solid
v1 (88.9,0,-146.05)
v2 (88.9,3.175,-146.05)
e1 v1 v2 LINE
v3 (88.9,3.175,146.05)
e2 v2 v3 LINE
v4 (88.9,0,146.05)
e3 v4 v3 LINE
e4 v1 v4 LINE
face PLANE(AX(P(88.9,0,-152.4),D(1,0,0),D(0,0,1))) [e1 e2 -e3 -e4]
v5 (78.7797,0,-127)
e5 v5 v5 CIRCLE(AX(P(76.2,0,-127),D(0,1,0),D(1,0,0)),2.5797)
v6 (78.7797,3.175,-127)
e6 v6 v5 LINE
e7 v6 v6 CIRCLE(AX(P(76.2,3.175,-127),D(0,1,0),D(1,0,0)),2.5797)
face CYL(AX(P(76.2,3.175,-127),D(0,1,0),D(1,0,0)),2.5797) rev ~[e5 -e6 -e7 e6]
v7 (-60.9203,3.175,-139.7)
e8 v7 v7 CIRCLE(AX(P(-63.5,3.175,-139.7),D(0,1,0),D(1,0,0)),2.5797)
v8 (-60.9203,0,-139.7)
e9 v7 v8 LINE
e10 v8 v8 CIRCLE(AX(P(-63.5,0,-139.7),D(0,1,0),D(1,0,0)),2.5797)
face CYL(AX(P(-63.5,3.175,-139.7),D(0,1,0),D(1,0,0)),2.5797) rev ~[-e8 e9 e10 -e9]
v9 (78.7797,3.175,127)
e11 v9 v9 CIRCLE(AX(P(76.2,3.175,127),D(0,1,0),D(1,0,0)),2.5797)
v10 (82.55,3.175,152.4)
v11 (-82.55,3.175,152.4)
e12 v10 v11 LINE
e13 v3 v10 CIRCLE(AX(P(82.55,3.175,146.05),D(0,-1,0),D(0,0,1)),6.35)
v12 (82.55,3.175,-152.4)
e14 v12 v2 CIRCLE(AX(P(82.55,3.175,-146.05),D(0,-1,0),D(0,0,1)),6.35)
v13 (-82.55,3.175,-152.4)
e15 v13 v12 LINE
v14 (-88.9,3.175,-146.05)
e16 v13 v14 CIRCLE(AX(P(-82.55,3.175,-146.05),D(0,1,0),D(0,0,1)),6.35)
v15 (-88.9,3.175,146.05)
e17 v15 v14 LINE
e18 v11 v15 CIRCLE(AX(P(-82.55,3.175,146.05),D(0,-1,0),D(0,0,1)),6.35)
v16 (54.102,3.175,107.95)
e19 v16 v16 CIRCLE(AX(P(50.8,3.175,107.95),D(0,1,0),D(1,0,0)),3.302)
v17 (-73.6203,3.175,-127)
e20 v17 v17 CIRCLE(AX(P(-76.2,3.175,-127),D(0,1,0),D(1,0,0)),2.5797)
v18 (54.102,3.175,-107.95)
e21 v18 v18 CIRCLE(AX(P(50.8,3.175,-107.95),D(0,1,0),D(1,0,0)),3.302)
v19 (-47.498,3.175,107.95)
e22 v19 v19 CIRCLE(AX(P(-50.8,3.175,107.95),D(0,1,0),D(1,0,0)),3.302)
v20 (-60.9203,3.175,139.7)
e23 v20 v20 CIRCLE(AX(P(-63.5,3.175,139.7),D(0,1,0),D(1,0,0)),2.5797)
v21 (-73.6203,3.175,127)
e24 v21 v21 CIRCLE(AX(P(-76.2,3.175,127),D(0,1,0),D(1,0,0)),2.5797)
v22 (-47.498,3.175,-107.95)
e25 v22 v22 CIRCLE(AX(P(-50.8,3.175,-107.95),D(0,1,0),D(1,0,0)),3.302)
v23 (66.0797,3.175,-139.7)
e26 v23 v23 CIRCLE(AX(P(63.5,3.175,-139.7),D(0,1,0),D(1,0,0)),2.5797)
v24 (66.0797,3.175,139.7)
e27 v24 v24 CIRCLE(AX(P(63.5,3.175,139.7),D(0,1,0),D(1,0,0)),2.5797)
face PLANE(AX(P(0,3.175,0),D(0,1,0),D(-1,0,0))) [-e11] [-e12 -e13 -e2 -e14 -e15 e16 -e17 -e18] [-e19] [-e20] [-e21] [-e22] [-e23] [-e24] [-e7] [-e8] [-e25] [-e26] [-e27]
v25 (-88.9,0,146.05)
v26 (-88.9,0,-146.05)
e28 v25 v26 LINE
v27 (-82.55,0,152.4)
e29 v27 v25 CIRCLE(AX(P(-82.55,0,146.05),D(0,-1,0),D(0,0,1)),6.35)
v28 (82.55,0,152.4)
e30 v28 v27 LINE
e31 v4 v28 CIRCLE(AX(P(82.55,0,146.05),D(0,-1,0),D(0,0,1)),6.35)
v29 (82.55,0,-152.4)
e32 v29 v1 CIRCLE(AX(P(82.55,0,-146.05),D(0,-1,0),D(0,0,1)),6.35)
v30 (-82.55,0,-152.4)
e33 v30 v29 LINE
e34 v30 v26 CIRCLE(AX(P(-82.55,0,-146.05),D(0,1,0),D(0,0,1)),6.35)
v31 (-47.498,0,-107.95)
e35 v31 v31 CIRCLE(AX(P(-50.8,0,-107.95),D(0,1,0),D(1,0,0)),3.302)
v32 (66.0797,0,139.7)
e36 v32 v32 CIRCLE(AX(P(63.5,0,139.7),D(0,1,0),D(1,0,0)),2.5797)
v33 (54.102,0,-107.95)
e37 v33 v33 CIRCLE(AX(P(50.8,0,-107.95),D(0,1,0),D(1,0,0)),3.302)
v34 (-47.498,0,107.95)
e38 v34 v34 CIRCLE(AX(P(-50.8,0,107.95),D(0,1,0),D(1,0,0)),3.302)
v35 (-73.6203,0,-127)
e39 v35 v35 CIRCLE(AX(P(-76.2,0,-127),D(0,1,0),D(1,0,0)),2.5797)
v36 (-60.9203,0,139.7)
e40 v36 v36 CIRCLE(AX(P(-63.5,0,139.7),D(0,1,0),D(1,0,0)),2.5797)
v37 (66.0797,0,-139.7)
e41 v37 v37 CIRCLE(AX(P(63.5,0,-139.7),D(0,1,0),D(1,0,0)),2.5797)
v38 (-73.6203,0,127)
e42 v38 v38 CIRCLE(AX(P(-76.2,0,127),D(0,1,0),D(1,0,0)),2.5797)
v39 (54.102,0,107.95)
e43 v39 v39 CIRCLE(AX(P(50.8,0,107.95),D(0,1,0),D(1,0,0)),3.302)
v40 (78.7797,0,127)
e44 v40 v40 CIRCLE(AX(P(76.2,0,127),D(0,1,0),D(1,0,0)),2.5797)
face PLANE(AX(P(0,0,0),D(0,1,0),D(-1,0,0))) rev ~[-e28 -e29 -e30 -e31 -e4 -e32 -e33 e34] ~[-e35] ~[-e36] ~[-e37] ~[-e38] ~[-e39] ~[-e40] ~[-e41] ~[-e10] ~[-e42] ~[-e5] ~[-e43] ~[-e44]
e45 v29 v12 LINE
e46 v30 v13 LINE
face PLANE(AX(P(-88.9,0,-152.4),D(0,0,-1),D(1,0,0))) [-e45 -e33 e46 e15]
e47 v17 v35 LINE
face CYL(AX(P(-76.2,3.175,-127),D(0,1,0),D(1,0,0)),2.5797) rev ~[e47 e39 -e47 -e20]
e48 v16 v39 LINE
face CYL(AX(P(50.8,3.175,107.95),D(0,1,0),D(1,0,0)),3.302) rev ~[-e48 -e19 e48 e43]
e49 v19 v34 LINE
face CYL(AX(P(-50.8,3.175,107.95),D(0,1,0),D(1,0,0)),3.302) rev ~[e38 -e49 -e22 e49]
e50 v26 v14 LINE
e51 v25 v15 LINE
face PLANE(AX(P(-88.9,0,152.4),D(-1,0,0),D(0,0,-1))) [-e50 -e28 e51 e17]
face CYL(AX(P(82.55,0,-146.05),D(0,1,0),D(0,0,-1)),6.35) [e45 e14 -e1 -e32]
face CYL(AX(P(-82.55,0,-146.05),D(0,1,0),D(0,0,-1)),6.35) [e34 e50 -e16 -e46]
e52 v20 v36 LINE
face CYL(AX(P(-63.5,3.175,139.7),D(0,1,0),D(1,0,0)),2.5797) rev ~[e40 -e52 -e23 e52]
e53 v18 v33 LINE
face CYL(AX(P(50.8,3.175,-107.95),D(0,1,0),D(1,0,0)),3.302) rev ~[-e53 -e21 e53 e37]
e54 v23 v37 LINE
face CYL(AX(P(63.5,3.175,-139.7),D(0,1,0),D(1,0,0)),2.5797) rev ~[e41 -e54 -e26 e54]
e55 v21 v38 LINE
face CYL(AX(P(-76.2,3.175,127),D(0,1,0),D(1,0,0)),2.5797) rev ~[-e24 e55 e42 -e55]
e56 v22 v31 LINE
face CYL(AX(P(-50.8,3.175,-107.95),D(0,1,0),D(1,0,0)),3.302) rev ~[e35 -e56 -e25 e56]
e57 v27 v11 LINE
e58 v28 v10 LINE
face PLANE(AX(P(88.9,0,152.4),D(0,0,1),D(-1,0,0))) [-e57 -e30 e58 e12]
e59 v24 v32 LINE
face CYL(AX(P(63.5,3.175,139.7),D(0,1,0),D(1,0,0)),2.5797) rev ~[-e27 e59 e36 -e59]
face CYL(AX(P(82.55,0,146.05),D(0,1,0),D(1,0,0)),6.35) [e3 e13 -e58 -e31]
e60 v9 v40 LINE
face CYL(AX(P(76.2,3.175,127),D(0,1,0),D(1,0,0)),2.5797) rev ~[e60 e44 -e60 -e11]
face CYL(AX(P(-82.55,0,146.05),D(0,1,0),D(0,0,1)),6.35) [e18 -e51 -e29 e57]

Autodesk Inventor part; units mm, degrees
ref_plane "YZ Plane" through (0, 0, 0) normal (1, 0, 0) x (0, 1, 0)
ref_plane "XZ Plane" through (0, 0, 0) normal (0, 1, 0) x (-1, 0, 0)
ref_plane "XY Plane" through (0, 0, 0) normal (0, 0, 1) x (1, 0, 0)
sketch "Sketch1" plane through (0, 0, 0) normal (0, 1, 0) x (-1, 0, 0)
  line L0 (88.9, -152.4) -> (-88.9, -152.4)
  line L1 (-88.9, -152.4) -> (-88.9, 152.4)
  line L2 (-88.9, 152.4) -> (88.9, 152.4)
  line L3 (88.9, 152.4) -> (88.9, -152.4)
  line L4 (88.9, -152.4) -> (-88.9, 152.4) construction
  line L5 (-88.9, -152.4) -> (88.9, 152.4) construction
  point P0 (0, 0)
  dimension "d0" = 177.8
  dimension "d1" = 304.8
extrude "Plate1" add sketch "Sketch1" along normal blind 3.175
fillet "Corner Round1" radius 6.35 4 edges at (-88.9, 1.5875, 152.4) (88.9, 1.5875, 152.4) (-88.9, 1.5875, -152.4) (88.9, 1.5875, -152.4)
sketch "Sketch2" plane through (0, 3.175, 0) normal (0, 1, 0) x (1, 0, 0)
  circle A0 centre (-76.2, 127) radius 2.5797
  line L0 (-88.9, -146.05) -> (-88.9, 146.05) projected
  line L1 (-82.55, 152.4) -> (82.55, 152.4) projected
  circle A1 centre (-63.5, 139.7) radius 2.5797
  line L2 (-88.9, 0) -> (88.9, 0) construction
  line L3 (88.9, 146.05) -> (88.9, -146.05) construction
  line L4 (-82.55, 152.4) -> (82.55, 152.4) construction
  line L5 (0, 152.4) -> (0, -152.4) construction
  line L6 (82.55, -152.4) -> (-82.55, -152.4) construction
  circle A2 centre (76.2, 127) radius 2.5797
  circle A3 centre (63.5, 139.7) radius 2.5797
  circle A4 centre (-76.2, -127) radius 2.5797
  circle A5 centre (-63.5, -139.7) radius 2.5797
  circle A6 centre (63.5, -139.7) radius 2.5797
  circle A7 centre (76.2, -127) radius 2.5797
  circle A8 centre (-50.8, 107.95) radius 3.302
  line L7 (-50.8, 107.95) -> (50.8, 107.95) construction
  circle A9 centre (50.8, 107.95) radius 3.302
  line L8 (50.8, 107.95) -> (50.8, -107.95) construction
  circle A10 centre (50.8, -107.95) radius 3.302
  line L9 (50.8, -107.95) -> (-50.8, -107.95) construction
  circle A11 centre (-50.8, -107.95) radius 3.302
  line L10 (-50.8, 107.95) -> (-50.8, -107.95) construction
  point P0 (0, 0)
  point P1 (0, 107.95)
  point P2 (-50.8, 0)
  dimension "d4" = 5.1594
  dimension "d5" = 12.7
  dimension "d6" = 25.4
  dimension "d7" = 12.7
  dimension "d8" = 25.4
  dimension "d11" = 101.6
  dimension "d12" = 6.604
  dimension "d13" = 215.9
extrude "Cut1" cut sketch "Sketch2" against normal blind 3.175
equation "\"d9\" = Thickness"
equation "\"d2\" = Thickness"
equation "\"BendRadius\" = 1.5 * Thickness"
equation "\"BendReliefWidth\" = Thickness"
equation "\"BendReliefDepth\" = 0.5 * Thickness"
equation "\"CornerReliefSize\" = 4 * Thickness"
equation "\"MinimumRemnant\" = 2 * Thickness"
equation "\"TransitionRadius\" = BendRadius"
equation "\"JacobiRadiusSize\" = BendRadius"
equation "\"GapSize\" = Thickness"
equation "\"Thickness\" = 3.175"
properties part number "PDP_Plate" material "Aluminum 5052 H32"
